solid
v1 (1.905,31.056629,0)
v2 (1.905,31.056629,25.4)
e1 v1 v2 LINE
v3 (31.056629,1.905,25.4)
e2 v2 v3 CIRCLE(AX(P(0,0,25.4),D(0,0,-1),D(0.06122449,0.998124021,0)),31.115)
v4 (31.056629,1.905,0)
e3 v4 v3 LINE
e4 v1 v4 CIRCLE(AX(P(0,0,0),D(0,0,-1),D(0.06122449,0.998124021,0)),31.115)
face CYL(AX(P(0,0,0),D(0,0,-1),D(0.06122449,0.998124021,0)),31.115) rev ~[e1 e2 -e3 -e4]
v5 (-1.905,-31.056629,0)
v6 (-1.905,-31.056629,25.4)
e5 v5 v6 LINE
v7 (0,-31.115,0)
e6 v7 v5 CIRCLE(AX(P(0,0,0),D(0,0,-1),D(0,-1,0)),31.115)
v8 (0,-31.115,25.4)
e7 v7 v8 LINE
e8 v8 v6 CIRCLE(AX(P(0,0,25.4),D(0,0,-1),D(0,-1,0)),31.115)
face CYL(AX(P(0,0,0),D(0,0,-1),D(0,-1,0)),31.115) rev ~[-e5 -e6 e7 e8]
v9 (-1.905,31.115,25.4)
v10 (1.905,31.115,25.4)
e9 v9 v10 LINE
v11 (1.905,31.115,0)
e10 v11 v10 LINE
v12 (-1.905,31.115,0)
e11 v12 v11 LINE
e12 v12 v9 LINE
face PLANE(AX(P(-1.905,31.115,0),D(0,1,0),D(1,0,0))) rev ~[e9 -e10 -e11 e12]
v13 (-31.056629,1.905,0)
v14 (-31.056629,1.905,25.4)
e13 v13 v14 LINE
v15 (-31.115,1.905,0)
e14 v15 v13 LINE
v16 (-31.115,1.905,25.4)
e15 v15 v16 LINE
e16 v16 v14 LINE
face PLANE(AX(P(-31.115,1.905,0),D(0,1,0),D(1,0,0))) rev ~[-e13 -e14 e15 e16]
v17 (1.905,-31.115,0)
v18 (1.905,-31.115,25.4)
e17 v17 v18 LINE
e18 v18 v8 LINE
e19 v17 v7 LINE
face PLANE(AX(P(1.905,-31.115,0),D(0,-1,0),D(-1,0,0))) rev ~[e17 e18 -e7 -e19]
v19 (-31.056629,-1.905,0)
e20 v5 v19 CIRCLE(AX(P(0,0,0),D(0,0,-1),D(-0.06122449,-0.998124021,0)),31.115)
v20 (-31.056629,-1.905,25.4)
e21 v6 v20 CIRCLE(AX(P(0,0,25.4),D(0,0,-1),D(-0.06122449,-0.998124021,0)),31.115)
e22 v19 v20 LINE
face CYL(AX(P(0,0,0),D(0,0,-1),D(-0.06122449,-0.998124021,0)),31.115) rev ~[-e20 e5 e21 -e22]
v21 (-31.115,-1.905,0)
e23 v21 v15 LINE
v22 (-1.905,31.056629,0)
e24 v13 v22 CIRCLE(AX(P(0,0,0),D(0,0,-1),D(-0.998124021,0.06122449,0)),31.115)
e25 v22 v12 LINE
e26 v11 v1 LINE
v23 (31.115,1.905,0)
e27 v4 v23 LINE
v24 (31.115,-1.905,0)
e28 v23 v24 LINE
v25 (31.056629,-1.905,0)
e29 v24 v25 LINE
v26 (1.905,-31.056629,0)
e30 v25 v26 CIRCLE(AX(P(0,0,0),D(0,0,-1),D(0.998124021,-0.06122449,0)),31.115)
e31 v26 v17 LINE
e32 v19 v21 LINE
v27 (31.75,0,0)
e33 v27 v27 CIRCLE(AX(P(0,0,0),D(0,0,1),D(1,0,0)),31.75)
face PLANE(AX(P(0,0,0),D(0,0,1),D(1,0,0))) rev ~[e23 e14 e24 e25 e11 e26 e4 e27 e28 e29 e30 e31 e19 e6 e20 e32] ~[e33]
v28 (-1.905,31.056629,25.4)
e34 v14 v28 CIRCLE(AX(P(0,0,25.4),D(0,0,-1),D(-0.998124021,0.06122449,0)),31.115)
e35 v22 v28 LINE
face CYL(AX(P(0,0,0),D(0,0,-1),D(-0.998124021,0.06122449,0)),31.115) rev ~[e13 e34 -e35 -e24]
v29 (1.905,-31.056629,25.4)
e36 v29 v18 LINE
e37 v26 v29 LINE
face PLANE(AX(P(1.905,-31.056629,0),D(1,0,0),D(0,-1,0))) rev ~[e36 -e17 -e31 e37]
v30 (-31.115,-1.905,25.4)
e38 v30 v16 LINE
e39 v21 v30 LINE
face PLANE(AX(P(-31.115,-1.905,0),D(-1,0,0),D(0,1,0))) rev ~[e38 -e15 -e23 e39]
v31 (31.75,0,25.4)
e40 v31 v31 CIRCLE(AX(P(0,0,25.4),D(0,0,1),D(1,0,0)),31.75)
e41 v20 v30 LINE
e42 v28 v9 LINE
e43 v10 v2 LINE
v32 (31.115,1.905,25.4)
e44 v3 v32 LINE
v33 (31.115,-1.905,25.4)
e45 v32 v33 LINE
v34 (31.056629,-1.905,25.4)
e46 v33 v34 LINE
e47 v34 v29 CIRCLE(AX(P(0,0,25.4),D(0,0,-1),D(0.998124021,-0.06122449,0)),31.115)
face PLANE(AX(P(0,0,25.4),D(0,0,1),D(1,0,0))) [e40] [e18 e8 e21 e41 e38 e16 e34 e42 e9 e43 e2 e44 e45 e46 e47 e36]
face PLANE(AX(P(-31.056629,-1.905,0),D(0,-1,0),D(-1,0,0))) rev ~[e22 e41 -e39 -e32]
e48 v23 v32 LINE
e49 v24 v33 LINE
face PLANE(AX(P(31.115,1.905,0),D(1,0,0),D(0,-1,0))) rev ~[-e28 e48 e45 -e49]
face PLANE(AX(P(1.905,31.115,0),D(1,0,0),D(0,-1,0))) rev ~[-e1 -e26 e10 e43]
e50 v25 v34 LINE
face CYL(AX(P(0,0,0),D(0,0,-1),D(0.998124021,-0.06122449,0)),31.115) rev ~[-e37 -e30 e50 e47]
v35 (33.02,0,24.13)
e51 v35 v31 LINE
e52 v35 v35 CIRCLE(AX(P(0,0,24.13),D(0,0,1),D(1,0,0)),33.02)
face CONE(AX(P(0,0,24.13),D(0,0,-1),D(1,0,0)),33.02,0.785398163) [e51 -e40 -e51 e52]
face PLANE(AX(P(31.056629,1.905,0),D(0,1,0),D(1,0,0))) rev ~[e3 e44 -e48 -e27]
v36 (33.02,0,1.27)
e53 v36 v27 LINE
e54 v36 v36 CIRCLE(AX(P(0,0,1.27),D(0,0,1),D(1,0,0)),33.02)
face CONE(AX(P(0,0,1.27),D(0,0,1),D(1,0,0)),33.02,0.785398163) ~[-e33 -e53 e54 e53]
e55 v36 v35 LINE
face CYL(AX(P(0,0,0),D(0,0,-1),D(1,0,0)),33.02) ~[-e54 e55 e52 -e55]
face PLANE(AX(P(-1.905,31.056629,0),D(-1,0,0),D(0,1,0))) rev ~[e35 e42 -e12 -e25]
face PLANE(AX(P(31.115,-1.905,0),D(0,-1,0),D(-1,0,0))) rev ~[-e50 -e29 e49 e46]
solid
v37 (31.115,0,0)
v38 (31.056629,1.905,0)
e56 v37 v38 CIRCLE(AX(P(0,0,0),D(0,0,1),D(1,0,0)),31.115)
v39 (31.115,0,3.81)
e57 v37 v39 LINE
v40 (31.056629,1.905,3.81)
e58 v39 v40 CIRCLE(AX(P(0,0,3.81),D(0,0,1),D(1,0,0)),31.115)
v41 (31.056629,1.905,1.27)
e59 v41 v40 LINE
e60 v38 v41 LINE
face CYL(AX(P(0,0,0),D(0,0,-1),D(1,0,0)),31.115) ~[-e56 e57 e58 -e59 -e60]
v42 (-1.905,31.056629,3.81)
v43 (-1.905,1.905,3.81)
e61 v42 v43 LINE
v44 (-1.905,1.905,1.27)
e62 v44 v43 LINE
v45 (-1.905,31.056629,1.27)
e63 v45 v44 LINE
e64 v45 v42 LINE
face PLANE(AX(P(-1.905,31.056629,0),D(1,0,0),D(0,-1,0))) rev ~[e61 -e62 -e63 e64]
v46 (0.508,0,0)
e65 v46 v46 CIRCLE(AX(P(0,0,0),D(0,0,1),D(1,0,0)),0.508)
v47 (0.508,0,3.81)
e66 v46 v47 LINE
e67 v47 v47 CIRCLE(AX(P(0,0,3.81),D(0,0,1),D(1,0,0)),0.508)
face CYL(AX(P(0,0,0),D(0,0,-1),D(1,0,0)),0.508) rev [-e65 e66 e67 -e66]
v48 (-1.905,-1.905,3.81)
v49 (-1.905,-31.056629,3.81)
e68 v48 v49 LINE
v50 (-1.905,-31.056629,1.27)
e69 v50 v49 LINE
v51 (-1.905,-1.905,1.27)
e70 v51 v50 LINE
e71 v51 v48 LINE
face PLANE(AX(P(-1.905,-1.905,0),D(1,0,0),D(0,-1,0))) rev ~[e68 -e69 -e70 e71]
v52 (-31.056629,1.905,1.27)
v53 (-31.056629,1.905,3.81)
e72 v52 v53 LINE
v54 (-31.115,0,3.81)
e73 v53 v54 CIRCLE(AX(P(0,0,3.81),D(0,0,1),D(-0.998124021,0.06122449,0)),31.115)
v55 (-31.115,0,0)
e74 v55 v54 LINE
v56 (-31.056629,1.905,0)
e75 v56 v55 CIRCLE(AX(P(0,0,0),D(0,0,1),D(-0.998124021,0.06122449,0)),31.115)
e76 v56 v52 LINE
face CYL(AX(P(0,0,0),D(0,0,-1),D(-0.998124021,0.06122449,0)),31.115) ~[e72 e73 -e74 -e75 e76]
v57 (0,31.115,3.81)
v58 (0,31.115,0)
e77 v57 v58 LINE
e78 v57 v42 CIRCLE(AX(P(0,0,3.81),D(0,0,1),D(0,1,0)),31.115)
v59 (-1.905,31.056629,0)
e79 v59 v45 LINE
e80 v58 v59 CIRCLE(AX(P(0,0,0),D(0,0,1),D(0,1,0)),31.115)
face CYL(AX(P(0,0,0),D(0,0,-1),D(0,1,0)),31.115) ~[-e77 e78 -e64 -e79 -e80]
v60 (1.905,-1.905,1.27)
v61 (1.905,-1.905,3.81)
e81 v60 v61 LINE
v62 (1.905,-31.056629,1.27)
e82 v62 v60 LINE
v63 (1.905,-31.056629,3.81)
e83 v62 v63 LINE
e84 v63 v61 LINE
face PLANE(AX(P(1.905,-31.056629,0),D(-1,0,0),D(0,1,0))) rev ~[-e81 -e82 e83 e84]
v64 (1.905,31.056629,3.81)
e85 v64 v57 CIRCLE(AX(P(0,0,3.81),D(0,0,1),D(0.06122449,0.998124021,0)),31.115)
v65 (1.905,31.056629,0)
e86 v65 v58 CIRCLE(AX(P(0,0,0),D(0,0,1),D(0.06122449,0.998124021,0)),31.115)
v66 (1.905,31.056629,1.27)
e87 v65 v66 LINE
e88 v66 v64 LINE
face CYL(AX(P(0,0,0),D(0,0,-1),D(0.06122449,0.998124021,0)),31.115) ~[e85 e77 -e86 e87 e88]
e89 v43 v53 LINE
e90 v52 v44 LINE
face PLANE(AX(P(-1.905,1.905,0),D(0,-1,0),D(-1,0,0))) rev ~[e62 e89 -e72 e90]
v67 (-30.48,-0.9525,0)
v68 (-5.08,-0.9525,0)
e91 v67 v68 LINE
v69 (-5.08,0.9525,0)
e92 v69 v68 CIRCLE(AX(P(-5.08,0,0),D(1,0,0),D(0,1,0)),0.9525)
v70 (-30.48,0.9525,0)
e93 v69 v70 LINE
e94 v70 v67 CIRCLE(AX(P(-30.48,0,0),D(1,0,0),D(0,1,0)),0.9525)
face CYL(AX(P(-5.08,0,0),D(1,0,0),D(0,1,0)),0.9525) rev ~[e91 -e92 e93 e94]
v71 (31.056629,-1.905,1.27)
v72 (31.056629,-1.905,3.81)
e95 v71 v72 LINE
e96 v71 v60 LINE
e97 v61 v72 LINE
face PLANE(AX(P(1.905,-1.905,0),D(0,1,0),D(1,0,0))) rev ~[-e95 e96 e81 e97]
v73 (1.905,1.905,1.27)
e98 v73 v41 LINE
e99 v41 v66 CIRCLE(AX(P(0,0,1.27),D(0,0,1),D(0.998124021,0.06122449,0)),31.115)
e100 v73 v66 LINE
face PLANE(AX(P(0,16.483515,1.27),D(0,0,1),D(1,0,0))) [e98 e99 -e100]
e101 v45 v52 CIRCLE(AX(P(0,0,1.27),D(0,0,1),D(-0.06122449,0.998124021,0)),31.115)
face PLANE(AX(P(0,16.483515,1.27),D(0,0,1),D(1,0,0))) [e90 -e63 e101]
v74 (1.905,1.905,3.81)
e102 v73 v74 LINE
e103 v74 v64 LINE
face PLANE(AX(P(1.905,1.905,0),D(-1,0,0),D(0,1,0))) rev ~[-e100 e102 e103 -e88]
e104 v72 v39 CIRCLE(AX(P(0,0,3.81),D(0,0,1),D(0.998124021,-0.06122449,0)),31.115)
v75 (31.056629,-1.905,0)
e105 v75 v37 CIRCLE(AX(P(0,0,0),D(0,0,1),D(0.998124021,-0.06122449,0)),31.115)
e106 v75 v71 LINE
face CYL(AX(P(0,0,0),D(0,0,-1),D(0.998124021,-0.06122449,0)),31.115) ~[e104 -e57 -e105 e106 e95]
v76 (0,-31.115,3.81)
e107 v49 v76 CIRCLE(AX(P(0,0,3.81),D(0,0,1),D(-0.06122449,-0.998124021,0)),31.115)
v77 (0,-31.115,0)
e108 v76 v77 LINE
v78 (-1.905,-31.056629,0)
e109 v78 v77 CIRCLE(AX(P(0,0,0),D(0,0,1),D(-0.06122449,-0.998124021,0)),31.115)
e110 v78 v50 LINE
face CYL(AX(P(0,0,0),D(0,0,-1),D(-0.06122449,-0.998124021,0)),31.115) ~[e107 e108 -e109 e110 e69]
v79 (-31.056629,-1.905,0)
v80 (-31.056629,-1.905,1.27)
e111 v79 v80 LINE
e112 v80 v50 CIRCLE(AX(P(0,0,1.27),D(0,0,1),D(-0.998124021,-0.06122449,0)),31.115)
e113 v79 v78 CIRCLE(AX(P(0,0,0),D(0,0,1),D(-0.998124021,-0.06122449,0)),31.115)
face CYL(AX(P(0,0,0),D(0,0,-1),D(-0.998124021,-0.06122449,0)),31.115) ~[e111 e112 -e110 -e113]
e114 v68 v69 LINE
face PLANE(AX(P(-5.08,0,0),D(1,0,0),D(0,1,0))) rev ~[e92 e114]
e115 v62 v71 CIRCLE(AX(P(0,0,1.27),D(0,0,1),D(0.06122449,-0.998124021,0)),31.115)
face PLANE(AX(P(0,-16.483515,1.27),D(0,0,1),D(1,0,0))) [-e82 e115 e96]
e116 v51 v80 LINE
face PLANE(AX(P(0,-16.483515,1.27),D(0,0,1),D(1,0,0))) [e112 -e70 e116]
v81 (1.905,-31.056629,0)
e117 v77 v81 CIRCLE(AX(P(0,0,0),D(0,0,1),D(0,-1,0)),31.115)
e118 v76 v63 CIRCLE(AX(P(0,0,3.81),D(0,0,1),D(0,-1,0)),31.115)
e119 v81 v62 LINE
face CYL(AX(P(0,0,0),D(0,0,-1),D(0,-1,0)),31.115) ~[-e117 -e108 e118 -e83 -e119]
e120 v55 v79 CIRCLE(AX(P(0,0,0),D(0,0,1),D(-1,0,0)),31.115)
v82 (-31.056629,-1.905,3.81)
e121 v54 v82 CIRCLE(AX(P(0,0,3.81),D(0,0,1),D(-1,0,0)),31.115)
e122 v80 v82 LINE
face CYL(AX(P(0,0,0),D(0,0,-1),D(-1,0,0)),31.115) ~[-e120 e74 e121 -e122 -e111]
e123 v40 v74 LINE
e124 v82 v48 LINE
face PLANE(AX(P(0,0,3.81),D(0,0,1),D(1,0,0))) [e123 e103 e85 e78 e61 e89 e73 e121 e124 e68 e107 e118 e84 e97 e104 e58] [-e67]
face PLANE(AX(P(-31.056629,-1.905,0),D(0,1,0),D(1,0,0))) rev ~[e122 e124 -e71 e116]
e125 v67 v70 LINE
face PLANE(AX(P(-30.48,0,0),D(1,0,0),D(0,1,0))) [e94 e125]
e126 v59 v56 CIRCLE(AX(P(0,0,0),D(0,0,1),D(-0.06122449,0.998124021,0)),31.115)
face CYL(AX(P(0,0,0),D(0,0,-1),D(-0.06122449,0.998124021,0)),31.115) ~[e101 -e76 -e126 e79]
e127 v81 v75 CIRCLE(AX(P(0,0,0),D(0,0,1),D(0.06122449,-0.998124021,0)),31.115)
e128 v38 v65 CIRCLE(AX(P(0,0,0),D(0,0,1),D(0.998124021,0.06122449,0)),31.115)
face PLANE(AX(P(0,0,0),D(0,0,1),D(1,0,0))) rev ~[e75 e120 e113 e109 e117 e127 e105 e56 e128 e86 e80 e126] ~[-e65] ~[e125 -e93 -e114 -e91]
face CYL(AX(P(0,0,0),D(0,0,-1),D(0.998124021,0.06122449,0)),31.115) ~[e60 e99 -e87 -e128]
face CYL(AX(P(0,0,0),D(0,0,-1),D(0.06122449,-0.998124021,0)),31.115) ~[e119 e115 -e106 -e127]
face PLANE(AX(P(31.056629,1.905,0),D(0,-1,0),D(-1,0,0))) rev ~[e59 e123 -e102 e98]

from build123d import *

# Parameters (mm, degrees)
F0_W     = 3.81
F0_H     = 3.81
F0_R     = 0.508
F1_DEPTH = 3.81
F2_DEPTH = 1.27
F4_R     = 0.9525
F5_DEPTH = 25.4
F0_R_2   = 33.02
F6_DEPTH = 25.4
F7_SIZE  = 1.27


# Not quite as in the source:
# - a feature names something its author has since deleted; it is built from what else it names


with BuildPart() as f1:
    # F0 (on Top) → F1 (new body)
    with BuildSketch(Plane.XY):
        Rectangle(F0_W, F0_H)
        Circle(F0_R, mode=Mode.SUBTRACT)
        with BuildLine():
            ThreePointArc((31.056628922, -1.905), (31.1004038069, -0.9529470319), (31.115, 0))
            ThreePointArc((31.115, 0), (31.1004038069, 0.9529470319), (31.056628922, 1.905))
            Line((31.056628922, 1.905), (1.905, 1.905))
            Line((1.905, 1.905), (1.905, -1.905))
            Line((1.905, -1.905), (31.056628922, -1.905))
        make_face()
        with BuildLine():
            ThreePointArc((0, -31.115), (0.9529470319, -31.1004038069), (1.905, -31.056628922))
            Line((1.905, -31.056628922), (1.905, -1.905))
            Line((1.905, -1.905), (-1.905, -1.905))
            Line((-1.905, -1.905), (-1.905, -31.056628922))
            ThreePointArc((-1.905, -31.056628922), (-0.9529470319, -31.1004038069), (0, -31.115))
        make_face()
        with BuildLine():
            Line((-1.905, -1.905), (-1.905, 1.905))
            Line((-1.905, 1.905), (-31.056628922, 1.905))
            ThreePointArc((-31.056628922, 1.905), (-31.1004038069, 0.9529470319), (-31.115, 0))
            ThreePointArc((-31.115, 0), (-31.1004038069, -0.9529470319), (-31.056628922, -1.905))
            Line((-31.056628922, -1.905), (-1.905, -1.905))
        make_face()
        with BuildLine():
            Line((1.905, 1.905), (1.905, 31.056628922))
            ThreePointArc((1.905, 31.056628922), (0.9529470319, 31.1004038069), (0, 31.115))
            ThreePointArc((0, 31.115), (-0.9529470319, 31.1004038069), (-1.905, 31.056628922))
            Line((-1.905, 31.056628922), (-1.905, 1.905))
            Line((-1.905, 1.905), (1.905, 1.905))
        make_face()
    extrude(amount=F1_DEPTH)

    # F0 (on Top) → F2 (join)
    with BuildSketch(Plane.XY):
        with BuildLine():
            Line((1.905, 1.905), (1.905, 31.056628922))
            ThreePointArc((1.905, 31.056628922), (0.9529470319, 31.1004038069), (0, 31.115))
            ThreePointArc((0, 31.115), (-0.9529470319, 31.1004038069), (-1.905, 31.056628922))
            Line((-1.905, 31.056628922), (-1.905, 1.905))
            Line((-1.905, 1.905), (1.905, 1.905))
        make_face()
        with BuildLine():
            ThreePointArc((0, -31.115), (0.9529470319, -31.1004038069), (1.905, -31.056628922))
            Line((1.905, -31.056628922), (1.905, -1.905))
            Line((1.905, -1.905), (-1.905, -1.905))
            Line((-1.905, -1.905), (-1.905, -31.056628922))
            ThreePointArc((-1.905, -31.056628922), (-0.9529470319, -31.1004038069), (0, -31.115))
        make_face()
        with BuildLine():
            Line((-31.056628922, 1.905), (-1.905, 1.905))
            Line((-1.905, 1.905), (-1.905, 31.056628922))
            ThreePointArc((-1.905, 31.056628922), (-22.0016274966, 22.0016274966), (-31.056628922, 1.905))
        make_face()
        with BuildLine():
            Line((-1.905, -31.056628922), (-1.905, -1.905))
            Line((-1.905, -1.905), (-31.056628922, -1.905))
            ThreePointArc((-31.056628922, -1.905), (-22.0016274966, -22.0016274966), (-1.905, -31.056628922))
        make_face()
        with BuildLine():
            Line((1.905, 1.905), (31.056628922, 1.905))
            ThreePointArc((31.056628922, 1.905), (22.0016274966, 22.0016274966), (1.905, 31.056628922))
            Line((1.905, 31.056628922), (1.905, 1.905))
        make_face()
        with BuildLine():
            ThreePointArc((1.905, -31.056628922), (22.0016274966, -22.0016274966), (31.056628922, -1.905))
            Line((31.056628922, -1.905), (1.905, -1.905))
            Line((1.905, -1.905), (1.905, -31.056628922))
        make_face()
    extrude(amount=F2_DEPTH)

    # F4 (on offset) → F5 (cut)
    with BuildSketch(Plane.YZ.offset(-5.08)):
        Circle(F4_R)
    extrude(amount=-F5_DEPTH, mode=Mode.SUBTRACT)


with BuildPart() as f6:
    # F0 (on Top) → F6 (new body)
    with BuildSketch(Plane.XY):
        Circle(F0_R_2)
        with BuildLine():
            Line((31.115, 1.905), (31.115, 0))
            Line((31.115, 0), (31.115, -1.905))
            Line((31.115, -1.905), (31.056628922, -1.905))
            ThreePointArc((31.056628922, -1.905), (22.0016274966, -22.0016274966), (1.905, -31.056628922))
            Line((1.905, -31.056628922), (1.905, -31.115))
            Line((1.905, -31.115), (0, -31.115))
            ThreePointArc((0, -31.115), (-0.9529470319, -31.1004038069), (-1.905, -31.056628922))
            ThreePointArc((-1.905, -31.056628922), (-22.0016274966, -22.0016274966), (-31.056628922, -1.905))
            Line((-31.056628922, -1.905), (-31.115, -1.905))
            Line((-31.115, -1.905), (-31.115, 0))
            Line((-31.115, 0), (-31.115, 1.905))
            Line((-31.115, 1.905), (-31.056628922, 1.905))
            ThreePointArc((-31.056628922, 1.905), (-22.0016274966, 22.0016274966), (-1.905, 31.056628922))
            Line((-1.905, 31.056628922), (-1.905, 31.115))
            Line((-1.905, 31.115), (0, 31.115))
            Line((0, 31.115), (1.905, 31.115))
            Line((1.905, 31.115), (1.905, 31.056628922))
            ThreePointArc((1.905, 31.056628922), (22.0016274966, 22.0016274966), (31.056628922, 1.905))
            Line((31.056628922, 1.905), (31.115, 1.905))
        make_face(mode=Mode.SUBTRACT)
    extrude(amount=F6_DEPTH)

    # F7
    f7_edges = [f6.edges().sort_by_distance(p)[0] for p in [
        (-33.02, 0, 25.4),
        (-33.02, 0, 0),
    ]]
    chamfer(f7_edges, length=F7_SIZE)


solid = Compound([f1.part, f6.part])
